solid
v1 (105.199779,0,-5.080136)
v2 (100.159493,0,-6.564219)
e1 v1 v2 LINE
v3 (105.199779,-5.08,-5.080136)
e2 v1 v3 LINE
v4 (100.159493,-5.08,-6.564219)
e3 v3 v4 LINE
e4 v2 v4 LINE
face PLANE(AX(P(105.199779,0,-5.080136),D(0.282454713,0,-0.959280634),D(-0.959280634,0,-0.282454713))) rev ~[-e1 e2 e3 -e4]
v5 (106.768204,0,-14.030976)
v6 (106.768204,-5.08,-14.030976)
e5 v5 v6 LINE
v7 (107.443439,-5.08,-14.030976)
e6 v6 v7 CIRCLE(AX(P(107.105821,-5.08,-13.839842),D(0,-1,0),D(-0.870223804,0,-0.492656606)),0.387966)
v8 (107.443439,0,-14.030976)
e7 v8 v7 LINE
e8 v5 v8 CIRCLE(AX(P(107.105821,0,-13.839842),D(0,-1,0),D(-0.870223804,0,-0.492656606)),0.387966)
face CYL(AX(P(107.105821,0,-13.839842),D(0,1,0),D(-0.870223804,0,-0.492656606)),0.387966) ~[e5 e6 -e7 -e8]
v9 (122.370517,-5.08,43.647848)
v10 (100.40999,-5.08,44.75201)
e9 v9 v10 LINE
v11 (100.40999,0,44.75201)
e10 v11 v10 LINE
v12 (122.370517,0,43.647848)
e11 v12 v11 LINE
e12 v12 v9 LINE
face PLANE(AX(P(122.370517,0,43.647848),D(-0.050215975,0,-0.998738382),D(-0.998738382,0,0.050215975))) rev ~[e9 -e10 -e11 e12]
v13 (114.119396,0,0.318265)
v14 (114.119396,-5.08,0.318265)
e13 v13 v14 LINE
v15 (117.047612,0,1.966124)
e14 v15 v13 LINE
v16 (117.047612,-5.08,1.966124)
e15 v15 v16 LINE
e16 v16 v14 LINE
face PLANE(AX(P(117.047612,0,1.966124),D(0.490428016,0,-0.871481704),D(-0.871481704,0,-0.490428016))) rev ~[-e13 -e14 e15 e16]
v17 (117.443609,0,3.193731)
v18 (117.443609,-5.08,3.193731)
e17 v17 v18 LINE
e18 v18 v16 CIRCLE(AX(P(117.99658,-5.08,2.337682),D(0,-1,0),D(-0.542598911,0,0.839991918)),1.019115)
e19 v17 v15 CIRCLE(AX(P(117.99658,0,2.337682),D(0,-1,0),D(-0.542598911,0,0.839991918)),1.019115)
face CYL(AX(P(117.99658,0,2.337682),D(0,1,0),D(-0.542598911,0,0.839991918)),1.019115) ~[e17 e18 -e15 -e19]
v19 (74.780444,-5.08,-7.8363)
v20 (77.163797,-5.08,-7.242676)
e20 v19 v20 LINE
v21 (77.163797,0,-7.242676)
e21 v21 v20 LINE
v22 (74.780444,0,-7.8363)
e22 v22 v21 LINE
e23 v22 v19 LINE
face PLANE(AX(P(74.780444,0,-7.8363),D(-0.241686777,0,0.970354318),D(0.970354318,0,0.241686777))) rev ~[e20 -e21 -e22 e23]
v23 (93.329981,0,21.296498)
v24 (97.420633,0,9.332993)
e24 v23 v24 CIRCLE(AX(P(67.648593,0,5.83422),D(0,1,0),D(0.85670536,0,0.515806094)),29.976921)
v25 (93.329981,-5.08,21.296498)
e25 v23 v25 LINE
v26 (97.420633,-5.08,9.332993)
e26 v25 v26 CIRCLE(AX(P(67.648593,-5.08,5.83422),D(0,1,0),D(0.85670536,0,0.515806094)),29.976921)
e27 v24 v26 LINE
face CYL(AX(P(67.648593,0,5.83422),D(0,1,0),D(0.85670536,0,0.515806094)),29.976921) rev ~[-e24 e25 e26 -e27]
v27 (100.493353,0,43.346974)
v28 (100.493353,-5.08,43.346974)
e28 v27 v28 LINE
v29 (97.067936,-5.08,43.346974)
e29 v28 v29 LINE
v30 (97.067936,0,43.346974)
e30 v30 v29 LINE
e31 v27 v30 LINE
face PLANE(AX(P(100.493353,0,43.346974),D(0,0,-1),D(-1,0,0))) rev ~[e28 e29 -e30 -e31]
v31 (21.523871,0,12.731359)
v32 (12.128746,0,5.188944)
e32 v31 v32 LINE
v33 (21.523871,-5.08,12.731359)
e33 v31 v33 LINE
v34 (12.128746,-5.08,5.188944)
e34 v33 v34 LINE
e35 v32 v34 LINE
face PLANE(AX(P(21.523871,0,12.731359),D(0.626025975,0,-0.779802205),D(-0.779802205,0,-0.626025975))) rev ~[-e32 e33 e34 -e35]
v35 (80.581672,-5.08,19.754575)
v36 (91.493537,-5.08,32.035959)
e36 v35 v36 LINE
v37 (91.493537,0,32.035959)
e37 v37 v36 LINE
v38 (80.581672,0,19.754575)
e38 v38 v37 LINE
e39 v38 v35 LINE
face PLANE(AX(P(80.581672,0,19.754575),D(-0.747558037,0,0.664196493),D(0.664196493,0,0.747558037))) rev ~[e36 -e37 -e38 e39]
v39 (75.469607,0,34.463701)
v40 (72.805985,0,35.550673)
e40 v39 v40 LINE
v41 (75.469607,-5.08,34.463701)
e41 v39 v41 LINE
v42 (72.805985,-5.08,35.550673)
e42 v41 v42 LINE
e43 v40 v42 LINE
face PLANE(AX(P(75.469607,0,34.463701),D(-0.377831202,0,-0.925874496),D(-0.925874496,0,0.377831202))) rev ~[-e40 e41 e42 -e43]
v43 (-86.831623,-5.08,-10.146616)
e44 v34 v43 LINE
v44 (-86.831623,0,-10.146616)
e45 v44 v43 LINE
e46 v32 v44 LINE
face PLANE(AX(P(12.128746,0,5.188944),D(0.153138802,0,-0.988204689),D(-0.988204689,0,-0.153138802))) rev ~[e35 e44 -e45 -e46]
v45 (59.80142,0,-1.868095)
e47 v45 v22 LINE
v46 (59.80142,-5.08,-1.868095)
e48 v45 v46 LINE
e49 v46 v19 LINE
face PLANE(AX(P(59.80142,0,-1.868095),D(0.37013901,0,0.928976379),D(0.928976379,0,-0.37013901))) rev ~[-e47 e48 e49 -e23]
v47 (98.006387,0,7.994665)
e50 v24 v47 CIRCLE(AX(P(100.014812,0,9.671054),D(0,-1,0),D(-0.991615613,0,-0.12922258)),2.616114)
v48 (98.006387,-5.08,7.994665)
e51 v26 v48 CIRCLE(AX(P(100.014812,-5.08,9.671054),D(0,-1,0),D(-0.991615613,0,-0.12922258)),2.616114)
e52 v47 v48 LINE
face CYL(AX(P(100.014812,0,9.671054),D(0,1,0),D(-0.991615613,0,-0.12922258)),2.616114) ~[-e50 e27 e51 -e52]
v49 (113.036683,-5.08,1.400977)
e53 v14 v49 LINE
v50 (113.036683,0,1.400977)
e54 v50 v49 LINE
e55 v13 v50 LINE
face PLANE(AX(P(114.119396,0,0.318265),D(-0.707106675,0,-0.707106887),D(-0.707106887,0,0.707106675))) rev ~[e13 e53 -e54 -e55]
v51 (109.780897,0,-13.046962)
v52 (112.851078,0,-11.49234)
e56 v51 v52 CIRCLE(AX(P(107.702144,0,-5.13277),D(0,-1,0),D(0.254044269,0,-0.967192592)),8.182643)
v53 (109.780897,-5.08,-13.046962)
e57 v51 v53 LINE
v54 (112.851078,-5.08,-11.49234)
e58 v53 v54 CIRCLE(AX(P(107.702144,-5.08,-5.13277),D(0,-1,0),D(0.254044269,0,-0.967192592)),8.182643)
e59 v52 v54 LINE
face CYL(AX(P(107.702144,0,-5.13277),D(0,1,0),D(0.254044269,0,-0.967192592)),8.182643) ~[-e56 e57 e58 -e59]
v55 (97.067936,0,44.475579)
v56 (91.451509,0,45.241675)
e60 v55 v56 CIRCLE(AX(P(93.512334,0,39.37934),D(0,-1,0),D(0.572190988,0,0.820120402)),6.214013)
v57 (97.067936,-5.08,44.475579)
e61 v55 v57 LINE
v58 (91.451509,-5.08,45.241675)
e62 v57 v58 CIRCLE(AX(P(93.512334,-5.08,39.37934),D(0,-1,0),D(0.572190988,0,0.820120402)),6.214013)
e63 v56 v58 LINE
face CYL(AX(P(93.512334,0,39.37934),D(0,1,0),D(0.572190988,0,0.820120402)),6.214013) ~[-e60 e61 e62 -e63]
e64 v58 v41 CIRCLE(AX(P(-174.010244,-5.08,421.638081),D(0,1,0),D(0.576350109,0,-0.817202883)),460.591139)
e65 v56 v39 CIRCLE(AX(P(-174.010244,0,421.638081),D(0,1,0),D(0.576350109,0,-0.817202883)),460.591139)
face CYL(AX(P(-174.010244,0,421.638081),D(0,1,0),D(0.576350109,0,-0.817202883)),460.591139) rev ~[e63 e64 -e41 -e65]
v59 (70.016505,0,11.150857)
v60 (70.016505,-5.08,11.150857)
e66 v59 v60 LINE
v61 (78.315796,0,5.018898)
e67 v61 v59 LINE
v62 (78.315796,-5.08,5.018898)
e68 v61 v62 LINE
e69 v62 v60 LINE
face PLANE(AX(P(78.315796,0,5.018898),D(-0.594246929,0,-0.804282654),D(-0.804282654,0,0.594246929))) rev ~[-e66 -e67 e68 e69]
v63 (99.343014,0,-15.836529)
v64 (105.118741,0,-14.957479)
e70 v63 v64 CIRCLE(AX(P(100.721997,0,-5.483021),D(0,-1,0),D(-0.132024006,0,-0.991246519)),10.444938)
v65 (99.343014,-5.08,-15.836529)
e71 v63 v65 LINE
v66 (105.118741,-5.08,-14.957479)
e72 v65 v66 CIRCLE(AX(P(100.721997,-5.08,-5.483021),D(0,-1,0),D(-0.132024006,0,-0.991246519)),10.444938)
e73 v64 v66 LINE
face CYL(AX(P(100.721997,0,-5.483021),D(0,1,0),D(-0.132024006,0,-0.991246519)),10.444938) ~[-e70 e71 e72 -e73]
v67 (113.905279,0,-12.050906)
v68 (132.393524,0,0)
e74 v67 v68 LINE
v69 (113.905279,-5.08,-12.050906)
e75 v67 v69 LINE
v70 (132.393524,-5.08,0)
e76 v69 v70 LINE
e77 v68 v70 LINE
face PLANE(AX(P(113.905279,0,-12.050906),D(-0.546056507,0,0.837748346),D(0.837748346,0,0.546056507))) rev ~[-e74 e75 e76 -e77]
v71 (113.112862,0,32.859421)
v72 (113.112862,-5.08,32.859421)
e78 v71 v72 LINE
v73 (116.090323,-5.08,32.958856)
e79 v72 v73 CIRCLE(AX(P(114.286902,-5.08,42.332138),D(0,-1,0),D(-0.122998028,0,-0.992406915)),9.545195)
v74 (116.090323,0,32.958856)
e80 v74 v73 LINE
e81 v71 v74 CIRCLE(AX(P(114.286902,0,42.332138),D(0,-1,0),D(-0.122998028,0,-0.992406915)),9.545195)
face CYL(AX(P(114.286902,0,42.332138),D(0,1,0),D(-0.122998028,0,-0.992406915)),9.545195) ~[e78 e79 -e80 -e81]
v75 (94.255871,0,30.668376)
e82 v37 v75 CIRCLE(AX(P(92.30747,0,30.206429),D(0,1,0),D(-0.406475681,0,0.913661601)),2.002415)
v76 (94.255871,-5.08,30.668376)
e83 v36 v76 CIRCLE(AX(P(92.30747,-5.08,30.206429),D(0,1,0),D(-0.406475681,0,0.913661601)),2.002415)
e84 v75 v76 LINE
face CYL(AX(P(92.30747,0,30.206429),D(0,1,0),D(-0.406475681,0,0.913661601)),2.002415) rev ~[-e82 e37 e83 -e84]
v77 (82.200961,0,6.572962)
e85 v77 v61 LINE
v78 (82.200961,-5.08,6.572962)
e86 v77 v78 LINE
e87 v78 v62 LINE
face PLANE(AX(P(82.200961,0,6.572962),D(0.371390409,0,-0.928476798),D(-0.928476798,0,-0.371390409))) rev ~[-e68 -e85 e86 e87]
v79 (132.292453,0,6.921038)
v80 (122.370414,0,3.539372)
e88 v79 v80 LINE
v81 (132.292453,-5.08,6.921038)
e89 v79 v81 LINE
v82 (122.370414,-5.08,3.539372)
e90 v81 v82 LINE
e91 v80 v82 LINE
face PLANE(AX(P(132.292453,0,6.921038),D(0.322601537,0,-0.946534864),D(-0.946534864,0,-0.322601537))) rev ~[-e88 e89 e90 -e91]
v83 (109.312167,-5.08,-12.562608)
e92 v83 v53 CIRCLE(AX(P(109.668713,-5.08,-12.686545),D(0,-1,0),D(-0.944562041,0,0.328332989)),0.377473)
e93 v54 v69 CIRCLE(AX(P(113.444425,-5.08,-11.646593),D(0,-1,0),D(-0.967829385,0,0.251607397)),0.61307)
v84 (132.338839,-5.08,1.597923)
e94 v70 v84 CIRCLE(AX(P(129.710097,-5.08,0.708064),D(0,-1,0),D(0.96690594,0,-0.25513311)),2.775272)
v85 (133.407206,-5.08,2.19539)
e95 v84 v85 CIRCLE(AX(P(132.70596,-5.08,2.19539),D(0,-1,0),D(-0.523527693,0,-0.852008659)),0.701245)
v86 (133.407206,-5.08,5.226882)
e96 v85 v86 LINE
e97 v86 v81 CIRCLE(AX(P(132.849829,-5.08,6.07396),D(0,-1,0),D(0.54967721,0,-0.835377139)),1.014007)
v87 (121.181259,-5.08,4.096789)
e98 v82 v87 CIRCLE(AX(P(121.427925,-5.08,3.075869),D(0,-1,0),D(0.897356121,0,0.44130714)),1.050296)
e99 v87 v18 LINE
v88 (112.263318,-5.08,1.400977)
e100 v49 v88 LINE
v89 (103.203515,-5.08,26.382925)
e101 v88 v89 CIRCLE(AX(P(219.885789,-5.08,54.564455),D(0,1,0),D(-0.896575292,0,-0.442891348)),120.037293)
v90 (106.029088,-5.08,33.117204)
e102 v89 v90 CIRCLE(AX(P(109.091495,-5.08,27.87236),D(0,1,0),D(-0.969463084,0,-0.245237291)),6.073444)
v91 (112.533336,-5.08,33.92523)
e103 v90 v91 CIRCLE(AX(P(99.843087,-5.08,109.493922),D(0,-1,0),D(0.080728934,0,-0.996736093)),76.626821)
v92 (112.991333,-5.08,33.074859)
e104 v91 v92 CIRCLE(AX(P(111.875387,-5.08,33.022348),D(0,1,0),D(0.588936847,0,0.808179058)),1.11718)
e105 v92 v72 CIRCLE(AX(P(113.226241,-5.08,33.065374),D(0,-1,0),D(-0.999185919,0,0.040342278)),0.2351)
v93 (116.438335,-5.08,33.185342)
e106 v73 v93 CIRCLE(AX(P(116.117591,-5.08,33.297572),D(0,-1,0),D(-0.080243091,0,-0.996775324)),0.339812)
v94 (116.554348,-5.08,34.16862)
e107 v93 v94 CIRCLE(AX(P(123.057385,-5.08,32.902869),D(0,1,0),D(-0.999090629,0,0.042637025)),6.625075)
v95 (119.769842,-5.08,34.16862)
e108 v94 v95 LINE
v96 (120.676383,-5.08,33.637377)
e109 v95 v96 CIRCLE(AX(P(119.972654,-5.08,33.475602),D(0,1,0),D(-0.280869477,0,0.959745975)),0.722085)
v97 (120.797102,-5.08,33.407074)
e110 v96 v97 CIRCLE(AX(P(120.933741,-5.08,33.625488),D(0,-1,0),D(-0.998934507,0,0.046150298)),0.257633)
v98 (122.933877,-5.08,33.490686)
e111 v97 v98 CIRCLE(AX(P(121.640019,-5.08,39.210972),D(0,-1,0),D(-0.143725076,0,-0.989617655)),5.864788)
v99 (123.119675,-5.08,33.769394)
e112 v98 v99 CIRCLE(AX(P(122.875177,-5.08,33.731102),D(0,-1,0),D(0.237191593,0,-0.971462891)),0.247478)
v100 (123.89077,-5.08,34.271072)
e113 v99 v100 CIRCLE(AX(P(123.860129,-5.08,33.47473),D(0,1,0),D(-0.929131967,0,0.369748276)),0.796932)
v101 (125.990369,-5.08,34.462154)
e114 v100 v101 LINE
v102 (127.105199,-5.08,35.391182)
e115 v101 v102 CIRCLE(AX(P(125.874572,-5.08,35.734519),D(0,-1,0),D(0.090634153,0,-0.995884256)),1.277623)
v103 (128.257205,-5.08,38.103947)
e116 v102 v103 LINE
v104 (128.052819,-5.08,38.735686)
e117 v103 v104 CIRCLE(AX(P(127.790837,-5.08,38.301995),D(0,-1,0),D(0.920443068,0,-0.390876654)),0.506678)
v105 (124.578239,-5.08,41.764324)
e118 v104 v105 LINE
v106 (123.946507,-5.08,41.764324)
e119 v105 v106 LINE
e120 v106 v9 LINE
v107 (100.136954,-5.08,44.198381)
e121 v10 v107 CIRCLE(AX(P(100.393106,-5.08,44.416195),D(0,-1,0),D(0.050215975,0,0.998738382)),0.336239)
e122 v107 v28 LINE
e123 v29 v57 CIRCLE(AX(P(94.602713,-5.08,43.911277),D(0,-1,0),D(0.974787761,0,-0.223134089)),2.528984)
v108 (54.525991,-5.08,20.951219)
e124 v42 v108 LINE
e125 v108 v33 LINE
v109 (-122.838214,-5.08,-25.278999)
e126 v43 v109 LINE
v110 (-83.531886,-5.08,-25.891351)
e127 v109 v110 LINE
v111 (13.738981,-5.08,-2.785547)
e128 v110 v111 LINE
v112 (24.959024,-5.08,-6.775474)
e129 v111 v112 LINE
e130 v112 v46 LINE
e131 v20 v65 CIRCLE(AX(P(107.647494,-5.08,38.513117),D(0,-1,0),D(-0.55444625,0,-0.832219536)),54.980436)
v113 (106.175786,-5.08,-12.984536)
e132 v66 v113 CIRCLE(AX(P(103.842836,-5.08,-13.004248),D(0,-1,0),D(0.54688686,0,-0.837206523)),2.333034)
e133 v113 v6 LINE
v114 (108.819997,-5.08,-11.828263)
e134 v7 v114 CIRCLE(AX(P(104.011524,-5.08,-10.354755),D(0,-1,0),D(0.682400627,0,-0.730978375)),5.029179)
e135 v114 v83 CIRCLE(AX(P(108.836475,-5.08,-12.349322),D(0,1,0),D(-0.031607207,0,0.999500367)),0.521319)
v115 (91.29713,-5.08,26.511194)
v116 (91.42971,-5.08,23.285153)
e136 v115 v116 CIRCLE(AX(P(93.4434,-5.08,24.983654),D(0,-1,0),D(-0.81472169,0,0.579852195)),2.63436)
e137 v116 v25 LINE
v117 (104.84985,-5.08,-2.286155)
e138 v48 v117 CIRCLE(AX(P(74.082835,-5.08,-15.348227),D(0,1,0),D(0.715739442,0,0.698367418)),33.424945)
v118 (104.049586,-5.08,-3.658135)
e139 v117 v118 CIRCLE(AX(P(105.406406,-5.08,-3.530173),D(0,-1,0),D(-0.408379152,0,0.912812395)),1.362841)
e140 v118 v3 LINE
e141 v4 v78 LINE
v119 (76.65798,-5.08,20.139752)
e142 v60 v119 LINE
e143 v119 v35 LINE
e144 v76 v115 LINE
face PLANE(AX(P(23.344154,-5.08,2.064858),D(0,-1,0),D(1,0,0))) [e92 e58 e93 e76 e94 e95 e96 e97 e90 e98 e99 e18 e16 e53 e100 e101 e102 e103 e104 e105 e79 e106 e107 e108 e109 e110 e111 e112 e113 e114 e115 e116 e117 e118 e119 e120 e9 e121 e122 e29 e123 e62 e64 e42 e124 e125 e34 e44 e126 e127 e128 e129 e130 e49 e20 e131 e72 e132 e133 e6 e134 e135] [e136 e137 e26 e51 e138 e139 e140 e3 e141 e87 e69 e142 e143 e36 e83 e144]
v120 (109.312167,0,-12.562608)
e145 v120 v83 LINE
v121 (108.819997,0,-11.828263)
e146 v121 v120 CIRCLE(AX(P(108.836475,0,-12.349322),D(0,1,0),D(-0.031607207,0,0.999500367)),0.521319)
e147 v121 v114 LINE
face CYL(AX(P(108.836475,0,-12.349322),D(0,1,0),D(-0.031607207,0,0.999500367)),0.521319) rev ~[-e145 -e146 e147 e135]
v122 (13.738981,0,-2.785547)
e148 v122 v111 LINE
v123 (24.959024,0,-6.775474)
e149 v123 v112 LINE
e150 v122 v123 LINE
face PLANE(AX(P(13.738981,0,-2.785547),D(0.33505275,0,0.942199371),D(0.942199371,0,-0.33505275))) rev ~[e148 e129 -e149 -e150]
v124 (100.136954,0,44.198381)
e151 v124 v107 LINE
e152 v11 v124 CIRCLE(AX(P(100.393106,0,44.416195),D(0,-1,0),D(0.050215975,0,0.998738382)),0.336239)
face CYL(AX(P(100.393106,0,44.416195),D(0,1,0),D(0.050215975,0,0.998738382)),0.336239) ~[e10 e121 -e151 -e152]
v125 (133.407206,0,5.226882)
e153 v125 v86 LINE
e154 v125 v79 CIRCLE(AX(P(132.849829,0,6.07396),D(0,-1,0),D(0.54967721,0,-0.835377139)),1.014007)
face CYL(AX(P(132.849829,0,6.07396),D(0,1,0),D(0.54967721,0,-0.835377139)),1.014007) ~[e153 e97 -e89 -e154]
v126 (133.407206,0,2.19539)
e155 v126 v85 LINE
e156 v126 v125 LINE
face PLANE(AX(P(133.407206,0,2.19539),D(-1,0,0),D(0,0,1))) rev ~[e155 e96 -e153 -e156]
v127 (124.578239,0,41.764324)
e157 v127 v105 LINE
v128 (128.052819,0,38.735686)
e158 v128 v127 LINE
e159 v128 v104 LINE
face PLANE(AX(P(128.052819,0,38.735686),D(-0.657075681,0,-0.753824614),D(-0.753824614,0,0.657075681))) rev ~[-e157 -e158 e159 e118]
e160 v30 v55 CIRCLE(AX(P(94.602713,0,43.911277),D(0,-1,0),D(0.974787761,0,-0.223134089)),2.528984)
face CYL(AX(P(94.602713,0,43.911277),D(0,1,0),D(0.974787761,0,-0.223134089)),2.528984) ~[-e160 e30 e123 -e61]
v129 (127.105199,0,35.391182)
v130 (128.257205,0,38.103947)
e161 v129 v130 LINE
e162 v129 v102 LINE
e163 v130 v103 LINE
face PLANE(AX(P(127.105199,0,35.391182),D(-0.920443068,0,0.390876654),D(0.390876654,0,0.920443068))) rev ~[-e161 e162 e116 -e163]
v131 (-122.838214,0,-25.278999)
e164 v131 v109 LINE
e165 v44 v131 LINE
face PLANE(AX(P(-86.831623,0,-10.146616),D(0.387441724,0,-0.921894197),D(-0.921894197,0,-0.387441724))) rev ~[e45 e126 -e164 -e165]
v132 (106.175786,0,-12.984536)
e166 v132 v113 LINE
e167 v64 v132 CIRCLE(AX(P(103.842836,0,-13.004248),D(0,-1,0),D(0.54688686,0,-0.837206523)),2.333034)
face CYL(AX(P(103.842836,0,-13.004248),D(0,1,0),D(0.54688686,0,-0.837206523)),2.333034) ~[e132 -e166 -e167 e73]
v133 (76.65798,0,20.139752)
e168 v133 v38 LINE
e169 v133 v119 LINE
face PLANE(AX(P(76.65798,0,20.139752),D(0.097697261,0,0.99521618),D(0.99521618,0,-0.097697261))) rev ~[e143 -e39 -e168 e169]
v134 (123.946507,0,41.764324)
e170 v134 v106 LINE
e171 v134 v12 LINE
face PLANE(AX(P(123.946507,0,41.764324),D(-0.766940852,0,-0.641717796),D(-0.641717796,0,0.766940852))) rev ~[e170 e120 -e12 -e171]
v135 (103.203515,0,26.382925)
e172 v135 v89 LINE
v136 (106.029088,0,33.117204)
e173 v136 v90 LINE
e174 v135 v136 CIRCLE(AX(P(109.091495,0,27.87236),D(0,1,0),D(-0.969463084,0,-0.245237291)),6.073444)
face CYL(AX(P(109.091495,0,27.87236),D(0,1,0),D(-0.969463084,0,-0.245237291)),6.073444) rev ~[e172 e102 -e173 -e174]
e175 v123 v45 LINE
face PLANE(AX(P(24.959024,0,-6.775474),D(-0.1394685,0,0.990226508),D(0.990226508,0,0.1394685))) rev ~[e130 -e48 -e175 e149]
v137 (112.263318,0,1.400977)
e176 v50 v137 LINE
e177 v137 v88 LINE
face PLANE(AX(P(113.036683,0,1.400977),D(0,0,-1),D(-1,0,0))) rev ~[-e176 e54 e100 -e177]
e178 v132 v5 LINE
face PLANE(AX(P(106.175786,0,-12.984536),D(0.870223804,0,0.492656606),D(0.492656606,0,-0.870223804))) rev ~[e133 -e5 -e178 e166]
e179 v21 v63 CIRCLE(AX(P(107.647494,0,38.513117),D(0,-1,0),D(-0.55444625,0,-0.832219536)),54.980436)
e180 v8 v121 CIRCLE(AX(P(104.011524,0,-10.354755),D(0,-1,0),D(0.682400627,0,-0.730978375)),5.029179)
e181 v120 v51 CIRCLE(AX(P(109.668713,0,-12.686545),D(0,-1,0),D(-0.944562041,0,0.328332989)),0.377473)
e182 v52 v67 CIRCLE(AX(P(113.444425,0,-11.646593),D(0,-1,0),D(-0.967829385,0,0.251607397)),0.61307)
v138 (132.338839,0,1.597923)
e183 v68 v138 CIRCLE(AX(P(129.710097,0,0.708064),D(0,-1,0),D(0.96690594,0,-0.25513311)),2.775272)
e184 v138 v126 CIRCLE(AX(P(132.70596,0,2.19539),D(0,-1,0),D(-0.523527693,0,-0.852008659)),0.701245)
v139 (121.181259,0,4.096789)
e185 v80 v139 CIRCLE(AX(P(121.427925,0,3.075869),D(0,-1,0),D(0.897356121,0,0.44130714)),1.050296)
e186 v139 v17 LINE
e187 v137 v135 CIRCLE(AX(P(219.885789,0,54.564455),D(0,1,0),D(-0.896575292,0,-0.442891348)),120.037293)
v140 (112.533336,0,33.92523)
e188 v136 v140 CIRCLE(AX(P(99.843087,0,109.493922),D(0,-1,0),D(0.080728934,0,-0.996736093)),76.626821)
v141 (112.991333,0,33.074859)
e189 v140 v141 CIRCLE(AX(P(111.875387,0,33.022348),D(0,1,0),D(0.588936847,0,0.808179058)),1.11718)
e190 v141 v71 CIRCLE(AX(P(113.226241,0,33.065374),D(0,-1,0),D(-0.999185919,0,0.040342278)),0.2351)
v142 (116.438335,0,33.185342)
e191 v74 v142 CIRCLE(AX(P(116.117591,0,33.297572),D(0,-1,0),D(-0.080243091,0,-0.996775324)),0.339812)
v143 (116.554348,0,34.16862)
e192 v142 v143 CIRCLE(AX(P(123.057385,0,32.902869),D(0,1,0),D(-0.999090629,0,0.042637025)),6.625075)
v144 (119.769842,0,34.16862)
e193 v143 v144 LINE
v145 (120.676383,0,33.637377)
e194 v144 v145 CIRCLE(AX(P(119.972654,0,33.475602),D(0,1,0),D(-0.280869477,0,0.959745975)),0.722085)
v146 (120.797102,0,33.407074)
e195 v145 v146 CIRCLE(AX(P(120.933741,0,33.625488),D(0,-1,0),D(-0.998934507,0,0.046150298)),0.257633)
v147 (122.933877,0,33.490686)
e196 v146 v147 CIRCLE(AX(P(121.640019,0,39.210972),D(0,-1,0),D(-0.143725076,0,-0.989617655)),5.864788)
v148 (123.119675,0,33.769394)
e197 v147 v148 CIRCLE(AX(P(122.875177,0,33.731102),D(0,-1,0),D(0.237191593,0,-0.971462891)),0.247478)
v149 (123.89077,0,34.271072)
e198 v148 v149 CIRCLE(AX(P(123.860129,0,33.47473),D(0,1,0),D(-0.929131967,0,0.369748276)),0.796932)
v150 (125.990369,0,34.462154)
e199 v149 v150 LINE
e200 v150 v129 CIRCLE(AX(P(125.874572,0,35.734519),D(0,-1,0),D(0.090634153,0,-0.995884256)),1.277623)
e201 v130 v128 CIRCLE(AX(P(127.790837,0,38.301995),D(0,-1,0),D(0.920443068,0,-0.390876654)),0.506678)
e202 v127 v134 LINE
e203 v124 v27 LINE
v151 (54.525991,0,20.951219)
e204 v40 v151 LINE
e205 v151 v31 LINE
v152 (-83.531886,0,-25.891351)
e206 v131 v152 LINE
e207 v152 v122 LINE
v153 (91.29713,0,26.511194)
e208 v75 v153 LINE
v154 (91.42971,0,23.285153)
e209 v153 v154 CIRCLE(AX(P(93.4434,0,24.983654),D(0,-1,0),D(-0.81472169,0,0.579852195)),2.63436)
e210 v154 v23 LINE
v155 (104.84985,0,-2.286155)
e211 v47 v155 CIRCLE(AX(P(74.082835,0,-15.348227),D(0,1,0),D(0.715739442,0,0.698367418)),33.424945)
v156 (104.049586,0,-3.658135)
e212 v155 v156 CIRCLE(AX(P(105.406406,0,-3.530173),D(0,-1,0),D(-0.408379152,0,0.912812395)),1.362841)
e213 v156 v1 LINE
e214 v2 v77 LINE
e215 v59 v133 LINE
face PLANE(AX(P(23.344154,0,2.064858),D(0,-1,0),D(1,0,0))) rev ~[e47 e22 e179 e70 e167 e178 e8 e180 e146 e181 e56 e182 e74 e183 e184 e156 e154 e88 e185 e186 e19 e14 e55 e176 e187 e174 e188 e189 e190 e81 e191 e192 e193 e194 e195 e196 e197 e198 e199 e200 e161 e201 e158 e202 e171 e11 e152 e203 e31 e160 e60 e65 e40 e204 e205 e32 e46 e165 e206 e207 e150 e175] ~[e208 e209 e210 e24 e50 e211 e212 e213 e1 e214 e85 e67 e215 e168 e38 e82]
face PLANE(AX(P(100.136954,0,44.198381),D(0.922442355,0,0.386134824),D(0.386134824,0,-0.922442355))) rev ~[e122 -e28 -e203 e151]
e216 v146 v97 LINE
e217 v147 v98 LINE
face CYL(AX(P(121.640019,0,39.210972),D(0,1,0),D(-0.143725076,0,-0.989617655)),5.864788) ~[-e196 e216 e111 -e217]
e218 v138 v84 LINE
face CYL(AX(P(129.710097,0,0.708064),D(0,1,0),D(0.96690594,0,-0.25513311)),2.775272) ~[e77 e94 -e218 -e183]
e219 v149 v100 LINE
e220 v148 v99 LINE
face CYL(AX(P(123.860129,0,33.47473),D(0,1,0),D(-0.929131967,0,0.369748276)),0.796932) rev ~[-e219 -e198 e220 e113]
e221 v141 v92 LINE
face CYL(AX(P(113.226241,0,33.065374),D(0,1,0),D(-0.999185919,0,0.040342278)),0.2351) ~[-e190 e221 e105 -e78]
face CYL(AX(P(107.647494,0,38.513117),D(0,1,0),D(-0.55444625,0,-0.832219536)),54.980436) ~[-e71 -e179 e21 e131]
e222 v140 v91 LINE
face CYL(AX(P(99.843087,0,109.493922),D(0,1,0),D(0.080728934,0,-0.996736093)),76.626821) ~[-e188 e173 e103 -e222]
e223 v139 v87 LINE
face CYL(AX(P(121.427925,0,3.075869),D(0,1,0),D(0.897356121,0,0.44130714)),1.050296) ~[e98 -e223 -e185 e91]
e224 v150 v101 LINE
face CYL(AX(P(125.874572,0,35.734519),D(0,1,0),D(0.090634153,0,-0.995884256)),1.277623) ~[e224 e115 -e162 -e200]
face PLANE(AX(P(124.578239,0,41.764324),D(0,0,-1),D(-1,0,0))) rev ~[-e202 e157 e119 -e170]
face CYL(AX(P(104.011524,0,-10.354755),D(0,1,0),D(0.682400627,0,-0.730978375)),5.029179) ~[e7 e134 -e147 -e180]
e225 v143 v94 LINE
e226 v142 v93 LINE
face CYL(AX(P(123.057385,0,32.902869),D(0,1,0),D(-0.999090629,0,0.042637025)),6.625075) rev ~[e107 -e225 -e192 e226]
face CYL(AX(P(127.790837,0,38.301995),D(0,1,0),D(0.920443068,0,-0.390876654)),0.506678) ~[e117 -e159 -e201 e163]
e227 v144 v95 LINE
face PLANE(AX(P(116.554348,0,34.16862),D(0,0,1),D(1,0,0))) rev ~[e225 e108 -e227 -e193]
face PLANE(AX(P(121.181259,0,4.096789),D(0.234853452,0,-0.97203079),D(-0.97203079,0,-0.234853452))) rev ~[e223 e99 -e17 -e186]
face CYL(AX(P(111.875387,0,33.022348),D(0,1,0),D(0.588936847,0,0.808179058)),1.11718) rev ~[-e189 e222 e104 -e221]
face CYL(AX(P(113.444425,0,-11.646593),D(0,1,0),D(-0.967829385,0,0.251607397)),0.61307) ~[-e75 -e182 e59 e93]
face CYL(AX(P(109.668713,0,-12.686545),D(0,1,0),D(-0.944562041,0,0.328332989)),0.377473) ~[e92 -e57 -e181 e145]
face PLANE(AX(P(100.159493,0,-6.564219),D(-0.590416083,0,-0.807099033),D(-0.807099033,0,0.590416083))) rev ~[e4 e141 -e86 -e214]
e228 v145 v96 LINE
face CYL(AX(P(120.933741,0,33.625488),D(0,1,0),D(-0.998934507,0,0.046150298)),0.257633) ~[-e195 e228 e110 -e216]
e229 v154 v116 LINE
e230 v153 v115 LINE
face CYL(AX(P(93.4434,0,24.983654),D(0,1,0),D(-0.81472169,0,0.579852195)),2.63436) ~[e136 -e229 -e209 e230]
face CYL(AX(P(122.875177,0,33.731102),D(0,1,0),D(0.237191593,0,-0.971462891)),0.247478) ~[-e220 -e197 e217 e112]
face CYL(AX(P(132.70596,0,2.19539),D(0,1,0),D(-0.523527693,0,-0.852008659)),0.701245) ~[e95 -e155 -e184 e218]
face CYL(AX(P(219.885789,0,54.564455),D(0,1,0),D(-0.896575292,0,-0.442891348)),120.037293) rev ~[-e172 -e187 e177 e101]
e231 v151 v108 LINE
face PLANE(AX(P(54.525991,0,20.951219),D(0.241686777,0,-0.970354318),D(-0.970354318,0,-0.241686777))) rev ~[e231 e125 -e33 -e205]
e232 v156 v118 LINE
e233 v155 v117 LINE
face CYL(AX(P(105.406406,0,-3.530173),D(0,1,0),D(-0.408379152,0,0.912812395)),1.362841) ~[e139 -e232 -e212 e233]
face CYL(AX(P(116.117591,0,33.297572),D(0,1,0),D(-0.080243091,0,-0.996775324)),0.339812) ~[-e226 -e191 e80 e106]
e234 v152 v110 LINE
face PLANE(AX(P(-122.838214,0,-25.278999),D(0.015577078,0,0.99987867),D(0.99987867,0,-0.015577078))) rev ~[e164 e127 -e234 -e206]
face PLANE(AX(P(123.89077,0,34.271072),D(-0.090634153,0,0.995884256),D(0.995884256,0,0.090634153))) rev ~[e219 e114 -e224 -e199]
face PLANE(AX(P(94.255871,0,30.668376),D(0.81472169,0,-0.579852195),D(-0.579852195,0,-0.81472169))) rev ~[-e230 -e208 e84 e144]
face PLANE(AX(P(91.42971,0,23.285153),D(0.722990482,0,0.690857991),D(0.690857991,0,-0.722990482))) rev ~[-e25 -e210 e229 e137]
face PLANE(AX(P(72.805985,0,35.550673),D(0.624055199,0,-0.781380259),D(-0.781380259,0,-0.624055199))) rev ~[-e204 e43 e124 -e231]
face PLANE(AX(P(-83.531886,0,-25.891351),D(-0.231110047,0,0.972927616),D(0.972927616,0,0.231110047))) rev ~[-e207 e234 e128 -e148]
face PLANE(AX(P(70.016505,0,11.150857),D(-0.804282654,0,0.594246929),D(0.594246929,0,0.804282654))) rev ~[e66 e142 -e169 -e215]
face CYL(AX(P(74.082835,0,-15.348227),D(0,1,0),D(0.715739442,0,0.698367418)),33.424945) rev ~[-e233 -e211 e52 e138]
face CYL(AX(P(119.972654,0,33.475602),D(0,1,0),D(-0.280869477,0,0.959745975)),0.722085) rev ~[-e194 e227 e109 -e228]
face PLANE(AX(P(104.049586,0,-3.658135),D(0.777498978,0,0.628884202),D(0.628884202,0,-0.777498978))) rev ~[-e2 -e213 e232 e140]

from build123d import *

# Parameters (mm, degrees)
F1_DEPTH = 5.08


# Not quite as in the source:
# - ends of sketch curves that miss each other by under 0.0002 mm in the source are joined


with BuildPart() as f1:
    # F0 (on Front) → F1 (new body)
    with BuildSketch(Plane.XZ):
        with BuildLine():
            Line((122.3705169674, 43.6478478759), (100.4099901217, 44.7520101639))
            ThreePointArc((100.4099901217, 44.7520101639), (100.0915452408, 44.5649170993), (100.1369538552, 44.1983805872))
            Line((100.1369538552, 44.1983805872), (100.4933528952, 43.3469744222))
            Line((100.4933528952, 43.3469744222), (97.0679359779, 43.3469744222))
            ThreePointArc((97.0679359779, 43.3469744222), (97.1316973251, 43.9112769391), (97.0679359779, 44.4755794561))
            ThreePointArc((97.0679359779, 44.4755794561), (94.352164437, 45.5363400819), (91.4515092493, 45.2416747635))
            ThreePointArc((91.4515092493, 45.2416747635), (83.5169492087, 39.7690696601), (75.469607442, 34.4637006676))
            Line((75.469607442, 34.4637006676), (72.8059848223, 35.5506727573))
            Line((72.8059848223, 35.5506727573), (54.5259908631, 20.9512186051))
            Line((54.5259908631, 20.9512186051), (21.5238705481, 12.7313591723))
            Line((21.5238705481, 12.7313591723), (12.1287463537, 5.188944246))
            Line((12.1287463537, 5.188944246), (-86.8316226794, -10.1466157916))
            Line((-86.8316226794, -10.1466157916), (-122.8382140398, -25.2789985389))
            Line((-122.8382140398, -25.2789985389), (-83.5318863392, -25.8913505822))
            Line((-83.5318863392, -25.8913505822), (13.7389805729, -2.7855467746))
            Line((13.7389805729, -2.7855467746), (24.9590244256, -6.7754736037))
            Line((24.9590244256, -6.7754736037), (59.8014198344, -1.8680947637))
            Line((59.8014198344, -1.8680947637), (74.7804443647, -7.8362995921))
            Line((74.7804443647, -7.8362995921), (77.1637969914, -7.2426764133))
            ThreePointArc((77.1637969914, -7.2426764133), (87.7830978003, -12.7533844887), (99.34301444, -15.8365290594))
            ThreePointArc((99.34301444, -15.8365290594), (102.2935896026, -15.8090472805), (105.1187411592, -14.9574794792))
            ThreePointArc((105.1187411592, -14.9574794792), (105.899310207, -14.1060464291), (106.1757861101, -12.9845357079))
            Line((106.1757861101, -12.9845357079), (106.7682035421, -14.0309760573))
            ThreePointArc((106.7682035421, -14.0309760573), (107.1058211072, -14.2278082292), (107.4434386724, -14.0309760573))
            ThreePointArc((107.4434386724, -14.0309760573), (108.2763784739, -13.0200234045), (108.8199970928, -11.8282630359))
            ThreePointArc((108.8199970928, -11.8282630359), (109.2695277638, -12.0590826755), (109.3121668662, -12.562607687))
            ThreePointArc((109.3121668662, -12.562607687), (109.3974608172, -12.9490474891), (109.7808973473, -13.0469617679))
            ThreePointArc((109.7808973473, -13.0469617679), (111.3986393651, -12.4328774082), (112.8510778468, -11.4923396397))
            ThreePointArc((112.8510778468, -11.4923396397), (113.1573925131, -12.1883188801), (113.9052785257, -12.0509060352))
            Line((113.9052785257, -12.0509060352), (132.3935237104, 0))
            ThreePointArc((132.3935237104, 0), (132.4837449873, 0.8029846441), (132.338838949, 1.5979226652))
            ThreePointArc((132.338838949, 1.5979226652), (133.0482342221, 1.5833492596), (133.4072056247, 2.1953897564))
            Line((133.4072056247, 2.1953897564), (133.4072056247, 5.2268817127))
            ThreePointArc((133.4072056247, 5.2268817127), (133.6969073142, 6.6313363292), (132.2924526977, 6.9210380187))
            Line((132.2924526977, 6.9210380187), (122.3704141488, 3.5393718949))
            ThreePointArc((122.3704141488, 3.5393718949), (121.873706248, 4.0268683816), (121.1812593401, 4.096788644))
            Line((121.1812593401, 4.096788644), (117.4436091822, 3.1937307858))
            ThreePointArc((117.4436091822, 3.1937307858), (117.0266780243, 2.6505498353), (117.0476117867, 1.966123862))
            Line((117.0476117867, 1.966123862), (114.1193957515, 0.3182646199))
            Line((114.1193957515, 0.3182646199), (113.0366831493, 1.4009768977))
            Line((113.0366831493, 1.4009768977), (112.2633179935, 1.4009768977))
            ThreePointArc((112.2633179935, 1.4009768977), (107.0399689979, 13.6404694995), (103.2035150013, 26.3829250952))
            ThreePointArc((103.2035150013, 26.3829250952), (103.4910499167, 30.2221985041), (106.029088113, 33.1172043332))
            ThreePointArc((106.029088113, 33.1172043332), (109.2898552798, 33.4516431179), (112.5333359919, 33.9252301607))
            ThreePointArc((112.5333359919, 33.9252301607), (112.8589818565, 33.5520971563), (112.9913329797, 33.074858591))
            ThreePointArc((112.9913329797, 33.074858591), (113.0214742771, 32.9498651341), (113.1128615921, 32.8594205615))
            ThreePointArc((113.1128615921, 32.8594205615), (114.605495502, 32.7922614875), (116.0903229782, 32.9588558937))
            ThreePointArc((116.0903229782, 32.9588558937), (116.3029445973, 33.0127632591), (116.4383345302, 33.1853422934))
            ThreePointArc((116.4383345302, 33.1853422934), (116.4779468759, 33.679151188), (116.554347608, 34.1686195634))
            Line((116.554347608, 34.1686195634), (119.7698420306, 34.1686195634))
            ThreePointArc((119.7698420306, 34.1686195634), (120.3377346413, 34.0985961328), (120.6763827811, 33.6373773826))
            ThreePointArc((120.6763827811, 33.6373773826), (120.705556032, 33.5058788759), (120.7971017103, 33.4070743991))
            ThreePointArc((120.7971017103, 33.4070743991), (121.8693321552, 33.350668944), (122.933876584, 33.4906863059))
            ThreePointArc((122.933876584, 33.4906863059), (123.0810934781, 33.5938295086), (123.11967467, 33.7693938154))
            ThreePointArc((123.11967467, 33.7693938154), (123.4255269006, 34.1427273195), (123.8907699445, 34.2710721767))
            Line((123.8907699445, 34.2710721767), (125.9903685922, 34.462153965))
            ThreePointArc((125.9903685922, 34.462153965), (126.6924885264, 34.7530229594), (127.1051986302, 35.3911824568))
            Line((127.1051986302, 35.3911824568), (128.2572048943, 38.1039466219))
            ThreePointArc((128.2572048943, 38.1039466219), (128.2729126944, 38.4579608874), (128.0528186952, 38.7356864116))
            Line((128.0528186952, 38.7356864116), (124.5782394715, 41.7643239316))
            Line((124.5782394715, 41.7643239316), (123.9465066021, 41.7643239316))
            Line((123.9465066021, 41.7643239316), (122.3705169674, 43.6478478759))
        make_face()
        with BuildLine():
            Line((70.0165052271, 11.150856785), (76.6579802489, 20.1397516237))
            Line((76.6579802489, 20.1397516237), (80.5816721076, 19.7545750625))
            Line((80.5816721076, 19.7545750625), (91.4935366546, 32.0359588494))
            ThreePointArc((91.4935366546, 32.0359588494), (93.1959095158, 32.0009597447), (94.2558714279, 30.6683761485))
            Line((94.2558714279, 30.6683761485), (91.2971296419, 26.5111941478))
            ThreePointArc((91.2971296419, 26.5111941478), (90.8112616397, 24.8754815968), (91.4297100848, 23.2851530817))
            Line((91.4297100848, 23.2851530817), (93.3299813237, 21.2964983411))
            ThreePointArc((93.3299813237, 21.2964983411), (96.0132194113, 15.5328655264), (97.4206326201, 9.3329931151))
            ThreePointArc((97.4206326201, 9.3329931151), (97.6181949936, 8.6221123526), (98.0063865531, 7.9946654121))
            ThreePointArc((98.0063865531, 7.9946654121), (101.9070751405, 3.1730744617), (104.8498501941, -2.2861549466))
            ThreePointArc((104.8498501941, -2.2861549466), (104.2291914062, -2.8435135125), (104.0495855612, -3.6581346774))
            Line((104.0495855612, -3.6581346774), (105.1997786885, -5.0801357056))
            Line((105.1997786885, -5.0801357056), (100.1594934993, -6.5642189378))
            Line((100.1594934993, -6.5642189378), (82.2009610937, 6.5729623924))
            Line((82.2009610937, 6.5729623924), (78.3157963351, 5.0188977865))
            Line((78.3157963351, 5.0188977865), (70.0165052271, 11.150856785))
        make_face(mode=Mode.SUBTRACT)
    extrude(amount=F1_DEPTH)


solid = f1.part
